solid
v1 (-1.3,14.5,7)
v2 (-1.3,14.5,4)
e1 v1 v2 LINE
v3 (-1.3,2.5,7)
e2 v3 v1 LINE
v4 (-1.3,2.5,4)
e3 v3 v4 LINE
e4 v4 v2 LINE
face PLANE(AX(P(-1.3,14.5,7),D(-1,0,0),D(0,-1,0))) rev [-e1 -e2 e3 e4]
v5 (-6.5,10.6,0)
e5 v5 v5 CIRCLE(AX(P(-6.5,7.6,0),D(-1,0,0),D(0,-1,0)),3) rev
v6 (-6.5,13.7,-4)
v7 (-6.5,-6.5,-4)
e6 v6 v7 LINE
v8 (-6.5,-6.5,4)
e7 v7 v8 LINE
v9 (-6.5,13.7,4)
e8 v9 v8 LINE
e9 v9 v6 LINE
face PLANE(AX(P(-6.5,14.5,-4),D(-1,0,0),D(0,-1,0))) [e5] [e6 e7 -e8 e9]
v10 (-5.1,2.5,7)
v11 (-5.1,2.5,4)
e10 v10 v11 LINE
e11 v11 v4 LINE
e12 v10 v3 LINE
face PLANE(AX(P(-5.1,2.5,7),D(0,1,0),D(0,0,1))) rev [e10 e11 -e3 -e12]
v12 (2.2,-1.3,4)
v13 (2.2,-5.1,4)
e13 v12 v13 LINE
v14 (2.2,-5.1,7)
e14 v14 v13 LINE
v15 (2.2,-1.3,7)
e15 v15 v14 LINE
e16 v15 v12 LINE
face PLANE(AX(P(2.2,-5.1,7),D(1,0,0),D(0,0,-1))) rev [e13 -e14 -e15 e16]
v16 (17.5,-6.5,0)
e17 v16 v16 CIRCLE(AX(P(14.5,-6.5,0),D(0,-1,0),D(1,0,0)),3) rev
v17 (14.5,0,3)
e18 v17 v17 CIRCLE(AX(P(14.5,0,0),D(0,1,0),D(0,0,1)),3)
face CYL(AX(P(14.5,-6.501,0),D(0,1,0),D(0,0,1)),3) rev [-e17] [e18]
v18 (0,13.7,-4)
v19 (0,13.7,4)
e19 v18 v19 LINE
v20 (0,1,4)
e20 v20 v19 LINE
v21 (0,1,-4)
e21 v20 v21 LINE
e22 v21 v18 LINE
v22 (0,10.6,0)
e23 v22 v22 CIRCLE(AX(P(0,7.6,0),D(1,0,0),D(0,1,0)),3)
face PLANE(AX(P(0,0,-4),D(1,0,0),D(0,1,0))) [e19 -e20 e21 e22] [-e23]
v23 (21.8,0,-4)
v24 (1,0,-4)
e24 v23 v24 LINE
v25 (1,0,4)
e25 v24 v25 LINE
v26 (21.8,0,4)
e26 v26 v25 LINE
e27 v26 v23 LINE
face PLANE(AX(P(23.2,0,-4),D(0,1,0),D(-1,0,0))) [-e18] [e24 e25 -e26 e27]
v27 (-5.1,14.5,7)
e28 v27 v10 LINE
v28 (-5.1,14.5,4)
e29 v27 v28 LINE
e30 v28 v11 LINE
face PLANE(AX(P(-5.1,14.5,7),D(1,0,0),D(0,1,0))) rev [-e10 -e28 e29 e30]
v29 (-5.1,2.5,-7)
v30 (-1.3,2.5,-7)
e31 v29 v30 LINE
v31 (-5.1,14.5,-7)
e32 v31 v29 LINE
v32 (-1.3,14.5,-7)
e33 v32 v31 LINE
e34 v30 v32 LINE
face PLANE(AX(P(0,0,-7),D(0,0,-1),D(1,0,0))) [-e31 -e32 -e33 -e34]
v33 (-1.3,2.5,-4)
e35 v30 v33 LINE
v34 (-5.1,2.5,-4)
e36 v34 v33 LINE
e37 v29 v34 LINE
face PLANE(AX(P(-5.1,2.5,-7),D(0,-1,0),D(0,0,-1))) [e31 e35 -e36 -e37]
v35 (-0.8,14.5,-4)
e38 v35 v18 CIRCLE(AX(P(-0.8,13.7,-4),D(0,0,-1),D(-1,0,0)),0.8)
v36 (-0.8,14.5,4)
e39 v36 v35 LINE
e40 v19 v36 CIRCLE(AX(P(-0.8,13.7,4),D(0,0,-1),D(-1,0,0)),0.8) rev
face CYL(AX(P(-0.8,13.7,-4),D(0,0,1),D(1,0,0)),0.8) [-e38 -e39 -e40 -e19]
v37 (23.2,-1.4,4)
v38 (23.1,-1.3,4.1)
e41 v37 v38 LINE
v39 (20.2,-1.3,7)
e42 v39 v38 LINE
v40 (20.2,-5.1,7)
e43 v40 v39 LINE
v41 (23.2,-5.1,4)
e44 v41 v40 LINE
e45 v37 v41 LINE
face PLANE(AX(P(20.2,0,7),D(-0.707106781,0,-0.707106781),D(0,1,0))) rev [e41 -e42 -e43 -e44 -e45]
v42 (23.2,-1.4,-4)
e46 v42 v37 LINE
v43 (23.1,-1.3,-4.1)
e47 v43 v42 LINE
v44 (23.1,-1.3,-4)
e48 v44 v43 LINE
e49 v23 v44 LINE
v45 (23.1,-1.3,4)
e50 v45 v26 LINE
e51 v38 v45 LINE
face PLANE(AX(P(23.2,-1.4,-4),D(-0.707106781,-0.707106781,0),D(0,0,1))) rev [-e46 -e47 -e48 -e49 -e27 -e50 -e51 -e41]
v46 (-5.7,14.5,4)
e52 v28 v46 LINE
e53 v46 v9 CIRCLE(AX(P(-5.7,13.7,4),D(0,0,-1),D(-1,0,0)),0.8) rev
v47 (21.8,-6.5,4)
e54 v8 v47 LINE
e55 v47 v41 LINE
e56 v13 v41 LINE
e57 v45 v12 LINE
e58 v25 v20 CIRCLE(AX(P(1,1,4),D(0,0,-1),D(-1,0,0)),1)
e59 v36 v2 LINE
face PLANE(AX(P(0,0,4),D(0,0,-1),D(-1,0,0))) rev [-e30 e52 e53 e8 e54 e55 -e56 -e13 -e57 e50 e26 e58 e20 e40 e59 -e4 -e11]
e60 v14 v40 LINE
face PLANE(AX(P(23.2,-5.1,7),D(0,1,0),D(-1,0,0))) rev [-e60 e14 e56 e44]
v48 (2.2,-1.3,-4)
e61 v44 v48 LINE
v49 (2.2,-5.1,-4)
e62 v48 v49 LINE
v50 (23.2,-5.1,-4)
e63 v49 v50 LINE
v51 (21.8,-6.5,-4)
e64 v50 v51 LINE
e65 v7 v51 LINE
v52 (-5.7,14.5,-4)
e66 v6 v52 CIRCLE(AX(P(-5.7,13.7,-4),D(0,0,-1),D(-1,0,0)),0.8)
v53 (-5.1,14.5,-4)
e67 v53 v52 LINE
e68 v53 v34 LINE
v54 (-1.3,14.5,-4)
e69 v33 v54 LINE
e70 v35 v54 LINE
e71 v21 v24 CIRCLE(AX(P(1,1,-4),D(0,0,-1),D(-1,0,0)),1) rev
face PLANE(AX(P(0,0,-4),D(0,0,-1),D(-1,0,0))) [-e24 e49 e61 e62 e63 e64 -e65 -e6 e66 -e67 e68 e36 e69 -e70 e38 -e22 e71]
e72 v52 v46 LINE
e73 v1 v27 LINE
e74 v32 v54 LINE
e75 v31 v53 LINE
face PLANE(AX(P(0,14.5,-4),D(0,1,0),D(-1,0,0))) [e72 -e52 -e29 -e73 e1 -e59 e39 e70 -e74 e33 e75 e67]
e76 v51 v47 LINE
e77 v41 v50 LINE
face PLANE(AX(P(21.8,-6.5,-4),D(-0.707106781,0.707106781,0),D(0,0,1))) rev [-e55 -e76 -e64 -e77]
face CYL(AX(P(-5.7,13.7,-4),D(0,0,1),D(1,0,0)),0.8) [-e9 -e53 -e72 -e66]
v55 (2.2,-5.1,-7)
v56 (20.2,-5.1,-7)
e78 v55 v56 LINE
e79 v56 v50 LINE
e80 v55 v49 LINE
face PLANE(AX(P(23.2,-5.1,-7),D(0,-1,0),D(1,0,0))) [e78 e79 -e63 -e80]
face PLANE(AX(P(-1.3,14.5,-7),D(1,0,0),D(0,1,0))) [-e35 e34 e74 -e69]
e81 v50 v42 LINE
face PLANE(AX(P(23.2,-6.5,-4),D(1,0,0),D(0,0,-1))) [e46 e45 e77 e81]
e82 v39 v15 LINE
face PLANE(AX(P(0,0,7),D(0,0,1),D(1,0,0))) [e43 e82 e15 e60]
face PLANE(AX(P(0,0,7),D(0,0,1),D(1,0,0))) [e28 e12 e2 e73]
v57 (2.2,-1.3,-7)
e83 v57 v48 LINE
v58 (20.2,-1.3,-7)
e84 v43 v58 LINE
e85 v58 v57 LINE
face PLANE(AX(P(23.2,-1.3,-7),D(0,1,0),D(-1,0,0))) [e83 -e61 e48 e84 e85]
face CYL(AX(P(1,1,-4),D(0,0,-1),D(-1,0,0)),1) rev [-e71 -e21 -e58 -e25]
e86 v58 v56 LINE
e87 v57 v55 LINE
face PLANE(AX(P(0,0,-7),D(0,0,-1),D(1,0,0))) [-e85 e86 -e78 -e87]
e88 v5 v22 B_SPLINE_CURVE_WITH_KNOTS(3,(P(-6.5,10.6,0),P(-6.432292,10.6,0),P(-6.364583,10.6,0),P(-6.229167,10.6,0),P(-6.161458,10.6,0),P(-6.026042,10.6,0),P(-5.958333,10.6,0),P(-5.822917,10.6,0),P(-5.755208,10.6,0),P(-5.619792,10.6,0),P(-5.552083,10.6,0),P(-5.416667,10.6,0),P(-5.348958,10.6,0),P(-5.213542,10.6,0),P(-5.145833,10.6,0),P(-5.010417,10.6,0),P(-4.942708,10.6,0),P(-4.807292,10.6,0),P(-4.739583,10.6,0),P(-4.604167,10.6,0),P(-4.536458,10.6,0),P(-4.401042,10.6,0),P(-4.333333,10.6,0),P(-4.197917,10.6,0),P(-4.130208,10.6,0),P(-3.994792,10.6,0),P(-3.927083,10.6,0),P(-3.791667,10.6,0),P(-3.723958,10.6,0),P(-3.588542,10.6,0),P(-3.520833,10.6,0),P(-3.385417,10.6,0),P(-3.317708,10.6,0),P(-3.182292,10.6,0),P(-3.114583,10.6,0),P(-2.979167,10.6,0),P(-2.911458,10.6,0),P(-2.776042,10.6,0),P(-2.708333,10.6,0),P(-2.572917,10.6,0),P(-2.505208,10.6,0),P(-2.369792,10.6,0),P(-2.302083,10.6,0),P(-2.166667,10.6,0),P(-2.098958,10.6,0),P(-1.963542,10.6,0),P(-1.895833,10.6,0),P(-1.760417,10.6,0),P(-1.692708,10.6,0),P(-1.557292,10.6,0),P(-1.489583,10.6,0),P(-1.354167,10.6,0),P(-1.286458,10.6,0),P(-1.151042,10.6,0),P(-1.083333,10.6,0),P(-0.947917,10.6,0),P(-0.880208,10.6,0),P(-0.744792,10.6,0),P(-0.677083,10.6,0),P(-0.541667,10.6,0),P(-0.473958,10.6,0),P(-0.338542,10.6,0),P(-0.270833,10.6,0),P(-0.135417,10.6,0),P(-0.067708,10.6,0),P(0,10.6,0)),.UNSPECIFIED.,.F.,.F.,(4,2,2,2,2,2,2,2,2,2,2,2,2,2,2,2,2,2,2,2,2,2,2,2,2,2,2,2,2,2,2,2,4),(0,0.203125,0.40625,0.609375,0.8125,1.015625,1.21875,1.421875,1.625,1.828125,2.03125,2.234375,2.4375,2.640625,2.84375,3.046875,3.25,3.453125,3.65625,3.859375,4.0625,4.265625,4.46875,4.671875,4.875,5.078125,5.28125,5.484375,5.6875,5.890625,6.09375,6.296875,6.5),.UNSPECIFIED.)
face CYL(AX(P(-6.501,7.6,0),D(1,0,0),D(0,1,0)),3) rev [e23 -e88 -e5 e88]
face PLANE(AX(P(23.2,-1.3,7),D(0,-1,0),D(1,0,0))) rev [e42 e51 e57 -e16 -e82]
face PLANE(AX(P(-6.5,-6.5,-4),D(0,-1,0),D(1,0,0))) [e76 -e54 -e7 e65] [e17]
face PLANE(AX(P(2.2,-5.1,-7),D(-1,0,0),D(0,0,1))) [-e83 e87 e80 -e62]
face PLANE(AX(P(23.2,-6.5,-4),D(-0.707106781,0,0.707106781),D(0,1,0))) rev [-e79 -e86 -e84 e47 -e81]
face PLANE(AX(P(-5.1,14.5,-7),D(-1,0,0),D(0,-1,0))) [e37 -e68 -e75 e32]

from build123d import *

# Parameters (mm, degrees)
EXTRUDE1_DEPTH           = 4
EXTRUDE1_DEPTH_BACK      = 4
SKETCH2_W                = 3.8
SKETCH2_H                = 12
SKETCH2_W_2              = 21
SKETCH2_H_2              = 3.8
EXTRUDE2_DEPTH           = 3
CHAMFER1_SIZE            = 3
CHAMFER1_OF_MIRROR1_SIZE = 3
CHAMFER2_SIZE            = 1.4
EXTRUDE3_REACH           = 30.24
SKETCH4_R                = 3
FILLET1_R                = 0.8
EXTRUDE4_REACH           = 30.24
SKETCH5_R                = 3
FILLET2_R                = 1


with BuildPart() as part:
    # Sketch1 → Extrude1 (new, two sides: drawn at the far end of the back side and taken through both)
    with BuildSketch(Plane.XY.offset(-EXTRUDE1_DEPTH_BACK)):
        Polygon((0, 0), (0, 14.5), (-6.5, 14.5), (-6.5, -6.5), (23.2, -6.5), (23.2, 0), align=None)
    extrude(amount=EXTRUDE1_DEPTH + EXTRUDE1_DEPTH_BACK)

    # Sketch2 → Extrude2 (add)
    with BuildSketch(Plane.XY.offset(4)):
        with Locations((-3.2, 8.5)):
            Rectangle(SKETCH2_W, SKETCH2_H)
        with Locations((12.7, -3.2)):
            Rectangle(SKETCH2_W_2, SKETCH2_H_2)
    extrude2 = extrude(amount=EXTRUDE2_DEPTH)

    # Chamfer1
    chamfer1_edges = [part.edges().sort_by_distance(p)[0] for p in [
        (23.2, -3.2, 7),
    ]]
    chamfer(chamfer1_edges, length=CHAMFER1_SIZE)

    # Mirror1: Extrude2 across plane
    add(extrude2.mirror(Plane.XY))

    # Chamfer1 of Mirror1
    chamfer1_of_mirror1_edges = [part.edges().sort_by_distance(p)[0] for p in [
        (23.2, -3.2, -7),
    ]]
    chamfer(chamfer1_of_mirror1_edges, length=CHAMFER1_OF_MIRROR1_SIZE)

    # Chamfer2
    # the kernel refuses this chamfer: 1.4 mm, written as the material it takes off along each edge
    with BuildSketch(Plane(origin=(23.2, 0, 7.600356183), x_dir=(0.027495876610586112, -0.9996219169112968, 0), z_dir=(0, 0, -1))) as chamfer2_piece_1:
        Polygon((CHAMFER2_SIZE * 0.999621916911, CHAMFER2_SIZE * 0.0274958766106), (-CHAMFER2_SIZE * 0.0274958766106, CHAMFER2_SIZE * 0.999621916911), (0, 0), align=None)
    extrude(amount=15.200712366, mode=Mode.SUBTRACT)
    with BuildSketch(Plane(origin=(23.2, -6.5, 7.600356183), x_dir=(0.02749587661058614, 0.9996219169112968, 0), z_dir=(0, 0, -1))) as chamfer2_piece_2:
        Polygon((CHAMFER2_SIZE * 0.999621916911, -CHAMFER2_SIZE * 0.0274958766106), (-CHAMFER2_SIZE * 0.0274958766106, -CHAMFER2_SIZE * 0.999621916911), (0, 0), align=None)
    extrude(amount=15.200712366, mode=Mode.SUBTRACT)

    # Sketch4 → Extrude3 (cut, up to next)
    with BuildSketch(Plane(origin=(0, 0, 0), x_dir=(1, 0, 0), z_dir=(0, 1, 0)), mode=Mode.PRIVATE) as extrude3_sk1:
        with Locations(Location((14.5, 0, 0), (0, 0, 270))):
            Circle(SKETCH4_R)
    extrude3_tool1 = extrude(extrude3_sk1.sketch, amount=-EXTRUDE3_REACH, mode=Mode.PRIVATE) & part.part
    add(extrude3_tool1.solids().sort_by_distance((14.5, 0, 0))[0], mode=Mode.SUBTRACT)

    # Fillet1
    fillet1_edges = [part.edges().sort_by_distance(p)[0] for p in [
        (-6.5, 14.5, 0),
        (0, 14.5, 0),
    ]]
    fillet(fillet1_edges, radius=FILLET1_R)

    # Sketch5 → Extrude4 (cut, up to next)
    with BuildSketch(Plane(origin=(0, 0, 0), x_dir=(0, 0, -1), z_dir=(1, 0, 0)), mode=Mode.PRIVATE) as extrude4_sk1:
        with Locations(Location((0, 7.6, 0), (0, 0, 90))):
            Circle(SKETCH5_R)
    extrude4_tool1 = extrude(extrude4_sk1.sketch, amount=-EXTRUDE4_REACH, mode=Mode.PRIVATE) & part.part
    add(extrude4_tool1.solids().sort_by_distance((0, 7.6, 0))[0], mode=Mode.SUBTRACT)

    # Fillet2
    fillet2_edges = [part.edges().sort_by_distance(p)[0] for p in [
        (0, 0, 0),
    ]]
    fillet(fillet2_edges, radius=FILLET2_R)


solid = part.part
